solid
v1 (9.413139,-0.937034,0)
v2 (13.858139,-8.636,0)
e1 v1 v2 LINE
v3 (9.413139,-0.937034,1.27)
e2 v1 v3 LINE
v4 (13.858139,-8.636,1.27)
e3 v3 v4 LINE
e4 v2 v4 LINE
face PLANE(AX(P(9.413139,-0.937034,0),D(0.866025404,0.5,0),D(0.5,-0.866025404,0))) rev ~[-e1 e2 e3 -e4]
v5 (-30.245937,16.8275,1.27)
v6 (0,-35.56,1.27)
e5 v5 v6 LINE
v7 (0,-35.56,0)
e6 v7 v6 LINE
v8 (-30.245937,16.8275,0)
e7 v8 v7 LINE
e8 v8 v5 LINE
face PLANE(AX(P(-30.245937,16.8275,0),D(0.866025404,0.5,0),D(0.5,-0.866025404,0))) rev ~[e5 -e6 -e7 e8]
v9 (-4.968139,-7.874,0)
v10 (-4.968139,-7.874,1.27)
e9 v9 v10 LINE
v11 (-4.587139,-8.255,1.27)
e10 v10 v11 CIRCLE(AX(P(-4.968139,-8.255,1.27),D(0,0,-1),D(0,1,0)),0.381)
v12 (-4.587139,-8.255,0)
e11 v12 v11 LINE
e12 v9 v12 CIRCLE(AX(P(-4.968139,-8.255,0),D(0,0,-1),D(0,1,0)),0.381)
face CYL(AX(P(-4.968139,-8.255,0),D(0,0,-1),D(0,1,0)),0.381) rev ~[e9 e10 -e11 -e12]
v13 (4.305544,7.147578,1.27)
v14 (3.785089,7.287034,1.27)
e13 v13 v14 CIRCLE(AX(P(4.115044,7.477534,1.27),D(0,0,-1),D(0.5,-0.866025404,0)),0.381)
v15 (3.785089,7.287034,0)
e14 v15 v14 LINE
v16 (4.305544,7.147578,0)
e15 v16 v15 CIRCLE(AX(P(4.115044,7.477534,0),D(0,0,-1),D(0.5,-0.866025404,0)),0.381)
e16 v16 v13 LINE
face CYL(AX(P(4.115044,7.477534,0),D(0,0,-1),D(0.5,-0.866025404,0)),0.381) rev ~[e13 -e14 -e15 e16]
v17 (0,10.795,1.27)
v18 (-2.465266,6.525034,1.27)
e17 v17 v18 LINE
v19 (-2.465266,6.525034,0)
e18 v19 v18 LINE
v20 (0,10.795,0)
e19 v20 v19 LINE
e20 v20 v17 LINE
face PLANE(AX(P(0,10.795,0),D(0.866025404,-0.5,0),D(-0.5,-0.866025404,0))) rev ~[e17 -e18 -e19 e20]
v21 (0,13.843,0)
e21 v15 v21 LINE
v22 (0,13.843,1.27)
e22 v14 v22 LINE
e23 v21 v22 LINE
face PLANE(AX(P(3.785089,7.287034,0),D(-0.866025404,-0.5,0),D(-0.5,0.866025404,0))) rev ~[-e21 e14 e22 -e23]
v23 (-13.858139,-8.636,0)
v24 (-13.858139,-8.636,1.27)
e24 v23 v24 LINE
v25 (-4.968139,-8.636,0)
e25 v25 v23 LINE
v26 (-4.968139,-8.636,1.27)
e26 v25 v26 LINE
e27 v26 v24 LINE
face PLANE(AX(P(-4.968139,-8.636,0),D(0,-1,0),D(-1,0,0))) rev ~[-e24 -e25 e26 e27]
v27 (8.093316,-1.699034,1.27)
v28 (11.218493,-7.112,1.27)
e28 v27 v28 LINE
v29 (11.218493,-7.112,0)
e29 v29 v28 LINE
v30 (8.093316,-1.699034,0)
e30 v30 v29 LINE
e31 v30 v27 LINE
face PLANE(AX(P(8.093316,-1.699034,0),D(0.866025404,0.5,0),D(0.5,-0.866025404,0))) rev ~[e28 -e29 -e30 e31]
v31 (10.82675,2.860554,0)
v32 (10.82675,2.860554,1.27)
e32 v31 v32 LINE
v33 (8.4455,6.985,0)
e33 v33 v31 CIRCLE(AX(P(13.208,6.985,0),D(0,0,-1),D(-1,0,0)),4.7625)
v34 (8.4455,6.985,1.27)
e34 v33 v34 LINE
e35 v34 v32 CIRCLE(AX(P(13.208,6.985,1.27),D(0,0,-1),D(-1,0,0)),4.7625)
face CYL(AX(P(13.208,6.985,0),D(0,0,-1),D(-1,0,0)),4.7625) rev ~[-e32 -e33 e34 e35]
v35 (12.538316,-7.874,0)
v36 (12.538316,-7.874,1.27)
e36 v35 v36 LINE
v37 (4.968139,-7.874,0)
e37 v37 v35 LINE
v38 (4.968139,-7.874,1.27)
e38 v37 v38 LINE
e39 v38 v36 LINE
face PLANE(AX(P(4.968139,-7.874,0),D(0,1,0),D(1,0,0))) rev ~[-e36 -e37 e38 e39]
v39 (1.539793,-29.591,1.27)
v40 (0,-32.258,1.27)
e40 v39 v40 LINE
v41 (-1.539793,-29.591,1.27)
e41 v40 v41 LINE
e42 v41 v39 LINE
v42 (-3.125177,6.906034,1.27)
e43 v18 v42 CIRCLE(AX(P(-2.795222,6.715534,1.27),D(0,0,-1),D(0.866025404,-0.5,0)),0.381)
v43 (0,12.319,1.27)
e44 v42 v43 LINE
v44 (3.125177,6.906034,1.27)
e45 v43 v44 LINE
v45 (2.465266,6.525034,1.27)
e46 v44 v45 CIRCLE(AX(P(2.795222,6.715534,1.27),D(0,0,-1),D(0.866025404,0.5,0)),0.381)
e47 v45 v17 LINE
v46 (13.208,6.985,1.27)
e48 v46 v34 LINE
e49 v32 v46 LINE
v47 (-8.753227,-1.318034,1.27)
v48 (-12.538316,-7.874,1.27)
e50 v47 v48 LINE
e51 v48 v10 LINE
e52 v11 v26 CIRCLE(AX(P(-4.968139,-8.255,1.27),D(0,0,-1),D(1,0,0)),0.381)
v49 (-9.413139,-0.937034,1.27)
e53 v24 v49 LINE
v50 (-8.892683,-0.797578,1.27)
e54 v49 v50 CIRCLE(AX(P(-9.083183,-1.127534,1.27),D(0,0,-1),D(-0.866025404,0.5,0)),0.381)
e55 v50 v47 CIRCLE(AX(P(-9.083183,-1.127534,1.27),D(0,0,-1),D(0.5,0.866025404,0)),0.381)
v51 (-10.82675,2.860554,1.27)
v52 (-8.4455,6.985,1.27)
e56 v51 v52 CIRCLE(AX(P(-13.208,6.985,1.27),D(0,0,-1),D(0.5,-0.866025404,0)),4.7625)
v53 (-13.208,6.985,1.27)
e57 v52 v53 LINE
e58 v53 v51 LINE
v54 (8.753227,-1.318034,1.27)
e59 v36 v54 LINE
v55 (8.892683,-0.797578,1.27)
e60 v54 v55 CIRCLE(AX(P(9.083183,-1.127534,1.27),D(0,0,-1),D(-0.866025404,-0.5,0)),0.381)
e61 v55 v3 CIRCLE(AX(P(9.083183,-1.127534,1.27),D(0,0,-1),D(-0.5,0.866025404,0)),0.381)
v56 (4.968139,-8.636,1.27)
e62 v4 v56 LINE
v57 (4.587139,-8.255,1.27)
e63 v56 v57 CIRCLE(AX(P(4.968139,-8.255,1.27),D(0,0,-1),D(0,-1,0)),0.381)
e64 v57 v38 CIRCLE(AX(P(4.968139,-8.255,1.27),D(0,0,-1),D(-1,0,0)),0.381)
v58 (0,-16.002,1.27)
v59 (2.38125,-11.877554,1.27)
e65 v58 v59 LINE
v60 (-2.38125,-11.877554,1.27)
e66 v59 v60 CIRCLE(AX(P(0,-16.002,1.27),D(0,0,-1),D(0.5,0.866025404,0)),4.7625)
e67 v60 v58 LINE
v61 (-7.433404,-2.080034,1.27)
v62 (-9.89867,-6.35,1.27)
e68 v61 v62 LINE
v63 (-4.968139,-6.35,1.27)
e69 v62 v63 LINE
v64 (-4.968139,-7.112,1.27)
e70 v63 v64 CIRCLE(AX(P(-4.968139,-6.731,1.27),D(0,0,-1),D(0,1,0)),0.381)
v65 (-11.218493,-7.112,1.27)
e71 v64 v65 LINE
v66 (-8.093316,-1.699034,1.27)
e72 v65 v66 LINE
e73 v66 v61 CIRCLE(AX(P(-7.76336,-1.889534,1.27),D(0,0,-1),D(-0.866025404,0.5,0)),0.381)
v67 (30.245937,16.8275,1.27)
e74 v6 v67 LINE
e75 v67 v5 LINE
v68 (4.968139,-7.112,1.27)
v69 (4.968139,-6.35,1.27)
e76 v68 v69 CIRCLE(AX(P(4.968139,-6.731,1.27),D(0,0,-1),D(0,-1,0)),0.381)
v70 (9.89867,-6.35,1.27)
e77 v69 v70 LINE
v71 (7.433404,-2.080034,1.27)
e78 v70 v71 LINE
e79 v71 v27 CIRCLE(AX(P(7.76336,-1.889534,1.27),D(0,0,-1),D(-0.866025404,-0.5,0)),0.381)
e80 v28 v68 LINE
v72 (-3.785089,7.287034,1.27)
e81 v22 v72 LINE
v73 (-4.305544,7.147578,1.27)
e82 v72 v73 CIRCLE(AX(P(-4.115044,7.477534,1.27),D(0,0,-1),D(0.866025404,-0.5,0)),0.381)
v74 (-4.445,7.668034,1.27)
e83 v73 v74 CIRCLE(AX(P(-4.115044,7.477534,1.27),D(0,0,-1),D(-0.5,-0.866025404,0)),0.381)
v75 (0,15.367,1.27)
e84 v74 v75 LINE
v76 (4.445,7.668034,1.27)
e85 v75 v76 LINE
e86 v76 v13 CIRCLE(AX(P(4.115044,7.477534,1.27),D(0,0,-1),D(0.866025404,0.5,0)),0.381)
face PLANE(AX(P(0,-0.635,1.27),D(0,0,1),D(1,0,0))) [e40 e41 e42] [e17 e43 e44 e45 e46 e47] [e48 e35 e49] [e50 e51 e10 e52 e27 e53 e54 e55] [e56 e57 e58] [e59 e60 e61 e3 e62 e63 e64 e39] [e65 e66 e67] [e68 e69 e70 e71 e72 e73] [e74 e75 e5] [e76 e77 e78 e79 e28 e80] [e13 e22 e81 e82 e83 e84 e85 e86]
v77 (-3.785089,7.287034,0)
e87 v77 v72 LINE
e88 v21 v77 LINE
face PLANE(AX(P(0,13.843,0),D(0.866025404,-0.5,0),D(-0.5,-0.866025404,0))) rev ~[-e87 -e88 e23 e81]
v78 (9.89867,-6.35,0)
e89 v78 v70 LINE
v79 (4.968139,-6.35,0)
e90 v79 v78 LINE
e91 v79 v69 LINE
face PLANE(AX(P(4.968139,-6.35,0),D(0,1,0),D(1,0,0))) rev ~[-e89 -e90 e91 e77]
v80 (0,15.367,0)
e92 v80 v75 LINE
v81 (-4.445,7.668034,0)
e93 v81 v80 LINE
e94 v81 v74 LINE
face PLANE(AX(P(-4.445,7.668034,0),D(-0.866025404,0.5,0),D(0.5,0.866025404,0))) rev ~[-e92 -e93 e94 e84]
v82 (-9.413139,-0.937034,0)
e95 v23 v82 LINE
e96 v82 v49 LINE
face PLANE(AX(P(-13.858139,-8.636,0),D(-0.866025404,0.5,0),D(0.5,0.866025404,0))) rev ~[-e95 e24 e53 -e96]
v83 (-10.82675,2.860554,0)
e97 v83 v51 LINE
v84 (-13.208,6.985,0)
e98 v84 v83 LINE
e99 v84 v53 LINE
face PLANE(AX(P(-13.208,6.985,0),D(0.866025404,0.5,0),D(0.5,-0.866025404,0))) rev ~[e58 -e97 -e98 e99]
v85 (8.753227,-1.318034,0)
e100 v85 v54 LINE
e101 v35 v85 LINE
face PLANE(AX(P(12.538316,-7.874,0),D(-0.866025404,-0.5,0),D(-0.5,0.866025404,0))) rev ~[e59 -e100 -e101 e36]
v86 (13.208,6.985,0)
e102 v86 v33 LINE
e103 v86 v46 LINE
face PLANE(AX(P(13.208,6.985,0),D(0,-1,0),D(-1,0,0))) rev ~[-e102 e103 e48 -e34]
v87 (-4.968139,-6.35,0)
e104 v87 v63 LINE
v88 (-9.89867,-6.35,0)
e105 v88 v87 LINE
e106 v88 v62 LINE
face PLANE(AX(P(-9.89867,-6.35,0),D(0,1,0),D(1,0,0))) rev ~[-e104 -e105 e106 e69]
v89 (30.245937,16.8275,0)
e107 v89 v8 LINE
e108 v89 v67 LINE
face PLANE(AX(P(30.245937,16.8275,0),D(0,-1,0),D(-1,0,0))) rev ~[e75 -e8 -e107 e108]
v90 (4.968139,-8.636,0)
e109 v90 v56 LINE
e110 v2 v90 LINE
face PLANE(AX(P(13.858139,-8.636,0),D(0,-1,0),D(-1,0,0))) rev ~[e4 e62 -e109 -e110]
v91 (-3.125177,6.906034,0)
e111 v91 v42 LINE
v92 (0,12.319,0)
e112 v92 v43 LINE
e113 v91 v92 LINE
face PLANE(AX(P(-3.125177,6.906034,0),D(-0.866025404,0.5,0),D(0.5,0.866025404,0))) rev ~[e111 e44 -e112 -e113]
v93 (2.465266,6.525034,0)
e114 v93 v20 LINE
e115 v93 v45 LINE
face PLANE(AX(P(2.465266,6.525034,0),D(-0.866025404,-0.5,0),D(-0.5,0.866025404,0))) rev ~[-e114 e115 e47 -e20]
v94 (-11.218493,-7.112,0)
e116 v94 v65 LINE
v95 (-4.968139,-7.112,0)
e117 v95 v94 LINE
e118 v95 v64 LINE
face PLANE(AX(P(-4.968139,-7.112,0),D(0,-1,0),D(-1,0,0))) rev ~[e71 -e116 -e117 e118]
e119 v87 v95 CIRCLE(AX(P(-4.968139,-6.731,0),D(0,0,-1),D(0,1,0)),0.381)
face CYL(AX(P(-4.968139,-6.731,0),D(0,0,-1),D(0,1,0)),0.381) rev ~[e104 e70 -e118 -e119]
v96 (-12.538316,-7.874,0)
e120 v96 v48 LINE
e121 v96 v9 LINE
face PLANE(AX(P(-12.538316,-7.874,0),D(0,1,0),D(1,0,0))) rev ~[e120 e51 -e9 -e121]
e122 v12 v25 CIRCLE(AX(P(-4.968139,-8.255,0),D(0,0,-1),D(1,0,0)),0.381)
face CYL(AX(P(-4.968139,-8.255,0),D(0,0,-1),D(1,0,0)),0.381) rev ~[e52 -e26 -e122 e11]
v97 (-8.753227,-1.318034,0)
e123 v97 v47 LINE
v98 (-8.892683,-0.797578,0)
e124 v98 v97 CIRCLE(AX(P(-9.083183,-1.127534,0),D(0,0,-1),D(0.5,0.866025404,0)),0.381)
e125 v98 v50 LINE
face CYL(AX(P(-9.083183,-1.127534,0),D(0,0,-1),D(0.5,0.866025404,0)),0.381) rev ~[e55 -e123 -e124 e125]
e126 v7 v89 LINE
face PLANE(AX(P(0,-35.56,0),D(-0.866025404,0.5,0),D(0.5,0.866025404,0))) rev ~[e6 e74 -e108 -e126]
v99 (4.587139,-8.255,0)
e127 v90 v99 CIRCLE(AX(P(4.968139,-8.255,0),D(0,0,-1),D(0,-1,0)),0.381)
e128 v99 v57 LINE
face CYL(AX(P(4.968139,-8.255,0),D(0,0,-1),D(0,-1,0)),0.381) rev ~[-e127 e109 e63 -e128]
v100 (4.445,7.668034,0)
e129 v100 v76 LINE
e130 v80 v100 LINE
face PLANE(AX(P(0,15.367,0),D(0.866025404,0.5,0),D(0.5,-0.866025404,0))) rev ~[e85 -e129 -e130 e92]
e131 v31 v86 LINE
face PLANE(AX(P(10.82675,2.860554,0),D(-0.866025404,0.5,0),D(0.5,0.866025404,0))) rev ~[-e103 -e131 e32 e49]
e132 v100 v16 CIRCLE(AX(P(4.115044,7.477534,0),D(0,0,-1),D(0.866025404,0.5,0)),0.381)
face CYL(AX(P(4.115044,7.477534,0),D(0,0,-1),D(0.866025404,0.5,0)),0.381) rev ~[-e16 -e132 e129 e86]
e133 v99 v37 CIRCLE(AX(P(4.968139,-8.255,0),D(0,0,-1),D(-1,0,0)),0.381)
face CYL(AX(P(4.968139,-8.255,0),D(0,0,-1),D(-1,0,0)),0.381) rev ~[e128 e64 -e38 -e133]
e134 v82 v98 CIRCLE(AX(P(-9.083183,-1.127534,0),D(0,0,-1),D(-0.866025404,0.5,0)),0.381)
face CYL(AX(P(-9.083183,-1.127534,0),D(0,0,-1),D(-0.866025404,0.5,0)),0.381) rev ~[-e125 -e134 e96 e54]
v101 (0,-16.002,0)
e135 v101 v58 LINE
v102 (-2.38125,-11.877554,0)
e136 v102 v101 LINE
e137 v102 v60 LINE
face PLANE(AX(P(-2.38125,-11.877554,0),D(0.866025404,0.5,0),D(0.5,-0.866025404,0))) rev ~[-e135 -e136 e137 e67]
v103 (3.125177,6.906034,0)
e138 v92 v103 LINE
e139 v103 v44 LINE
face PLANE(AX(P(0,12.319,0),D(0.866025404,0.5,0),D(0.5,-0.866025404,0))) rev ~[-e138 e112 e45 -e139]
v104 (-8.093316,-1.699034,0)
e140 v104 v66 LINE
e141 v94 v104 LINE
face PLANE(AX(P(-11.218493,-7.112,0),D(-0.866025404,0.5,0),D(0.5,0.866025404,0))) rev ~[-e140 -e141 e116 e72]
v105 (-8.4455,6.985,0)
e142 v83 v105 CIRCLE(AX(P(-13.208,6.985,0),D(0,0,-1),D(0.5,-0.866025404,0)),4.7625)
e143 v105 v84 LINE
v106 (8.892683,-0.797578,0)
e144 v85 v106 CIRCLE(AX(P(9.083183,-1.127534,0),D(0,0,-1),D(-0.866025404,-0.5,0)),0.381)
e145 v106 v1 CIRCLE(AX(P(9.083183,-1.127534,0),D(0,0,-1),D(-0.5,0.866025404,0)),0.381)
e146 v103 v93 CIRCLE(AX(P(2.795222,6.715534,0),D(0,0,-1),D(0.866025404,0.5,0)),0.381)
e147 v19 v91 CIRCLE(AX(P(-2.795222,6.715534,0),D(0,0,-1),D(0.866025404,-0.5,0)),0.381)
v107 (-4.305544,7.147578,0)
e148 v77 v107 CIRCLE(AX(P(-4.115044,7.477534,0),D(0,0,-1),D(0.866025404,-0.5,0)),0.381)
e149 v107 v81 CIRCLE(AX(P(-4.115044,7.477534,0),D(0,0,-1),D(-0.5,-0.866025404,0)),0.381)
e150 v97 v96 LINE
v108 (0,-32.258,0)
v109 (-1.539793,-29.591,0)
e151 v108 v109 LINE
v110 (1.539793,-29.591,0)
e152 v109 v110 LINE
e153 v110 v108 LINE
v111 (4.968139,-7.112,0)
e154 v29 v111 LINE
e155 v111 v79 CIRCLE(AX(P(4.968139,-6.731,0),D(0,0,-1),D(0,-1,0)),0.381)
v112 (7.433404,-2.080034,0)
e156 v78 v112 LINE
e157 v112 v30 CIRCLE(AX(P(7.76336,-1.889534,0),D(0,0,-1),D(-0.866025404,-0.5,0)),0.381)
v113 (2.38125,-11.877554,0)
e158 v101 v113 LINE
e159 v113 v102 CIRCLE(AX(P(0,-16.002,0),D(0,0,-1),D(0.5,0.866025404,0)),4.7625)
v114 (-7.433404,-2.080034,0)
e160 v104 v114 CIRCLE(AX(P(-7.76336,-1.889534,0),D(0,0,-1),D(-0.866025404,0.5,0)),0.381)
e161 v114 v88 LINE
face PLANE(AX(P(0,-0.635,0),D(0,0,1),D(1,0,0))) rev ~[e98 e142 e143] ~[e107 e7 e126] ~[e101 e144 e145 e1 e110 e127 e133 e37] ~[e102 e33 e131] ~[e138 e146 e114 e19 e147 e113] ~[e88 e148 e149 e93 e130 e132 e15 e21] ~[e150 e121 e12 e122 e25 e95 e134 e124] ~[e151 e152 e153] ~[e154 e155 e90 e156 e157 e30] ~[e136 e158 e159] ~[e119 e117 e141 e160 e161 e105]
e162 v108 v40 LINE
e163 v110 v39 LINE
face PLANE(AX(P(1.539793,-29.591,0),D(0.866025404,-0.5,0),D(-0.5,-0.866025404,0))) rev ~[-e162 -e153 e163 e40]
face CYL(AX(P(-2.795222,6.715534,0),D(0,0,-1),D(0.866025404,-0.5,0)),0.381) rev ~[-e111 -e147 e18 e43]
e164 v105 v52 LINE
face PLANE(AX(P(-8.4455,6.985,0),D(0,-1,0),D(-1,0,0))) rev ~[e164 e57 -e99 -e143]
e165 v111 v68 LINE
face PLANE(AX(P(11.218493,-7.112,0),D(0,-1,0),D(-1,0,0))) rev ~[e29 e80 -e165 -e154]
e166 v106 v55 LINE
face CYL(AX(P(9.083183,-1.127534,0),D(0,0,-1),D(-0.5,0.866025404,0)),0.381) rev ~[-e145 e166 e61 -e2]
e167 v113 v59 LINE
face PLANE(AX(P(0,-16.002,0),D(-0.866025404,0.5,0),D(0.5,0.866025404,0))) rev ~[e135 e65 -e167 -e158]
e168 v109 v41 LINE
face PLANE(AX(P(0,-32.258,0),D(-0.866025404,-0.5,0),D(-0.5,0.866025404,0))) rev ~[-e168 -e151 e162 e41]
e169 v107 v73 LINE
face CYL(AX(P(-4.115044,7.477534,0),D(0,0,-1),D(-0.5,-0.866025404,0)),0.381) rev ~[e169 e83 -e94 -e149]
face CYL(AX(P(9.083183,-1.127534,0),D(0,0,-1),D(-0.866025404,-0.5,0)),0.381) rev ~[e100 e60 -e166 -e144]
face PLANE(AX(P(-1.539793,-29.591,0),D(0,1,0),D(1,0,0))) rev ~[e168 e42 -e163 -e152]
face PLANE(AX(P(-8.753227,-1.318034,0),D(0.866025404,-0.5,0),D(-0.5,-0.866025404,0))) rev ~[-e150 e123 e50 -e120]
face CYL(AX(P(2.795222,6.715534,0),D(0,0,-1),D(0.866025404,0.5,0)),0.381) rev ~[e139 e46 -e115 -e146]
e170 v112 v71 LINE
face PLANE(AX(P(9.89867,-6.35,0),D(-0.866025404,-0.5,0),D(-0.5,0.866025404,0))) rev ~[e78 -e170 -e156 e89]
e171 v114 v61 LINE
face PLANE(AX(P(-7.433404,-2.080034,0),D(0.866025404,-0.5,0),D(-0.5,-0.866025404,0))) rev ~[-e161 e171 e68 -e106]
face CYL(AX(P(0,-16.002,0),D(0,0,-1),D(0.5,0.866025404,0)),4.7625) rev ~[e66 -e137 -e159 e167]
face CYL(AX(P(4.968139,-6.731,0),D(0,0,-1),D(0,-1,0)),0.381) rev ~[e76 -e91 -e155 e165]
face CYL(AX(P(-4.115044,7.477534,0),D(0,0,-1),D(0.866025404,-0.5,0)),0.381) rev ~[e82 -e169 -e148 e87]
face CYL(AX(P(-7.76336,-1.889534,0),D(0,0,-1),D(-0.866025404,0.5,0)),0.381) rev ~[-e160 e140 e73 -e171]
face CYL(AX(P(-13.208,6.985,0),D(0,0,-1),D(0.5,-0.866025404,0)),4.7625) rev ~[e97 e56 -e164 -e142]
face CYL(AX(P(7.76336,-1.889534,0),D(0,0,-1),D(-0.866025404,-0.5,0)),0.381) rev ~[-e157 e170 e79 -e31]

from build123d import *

# Parameters (mm, degrees)
F1_DEPTH = 1.27


# Not quite as in the source:
# - a feature of the source that left no trace in its solid (it failed there, or was rolled back) is left out


with BuildPart() as f1:
    # F0 (on Top) → F1 (new body)
    with BuildSketch(Plane.XY):
        Polygon((30.2459372272, 16.8275), (-30.2459372272, 16.8275), (0, -35.56), align=None)
        Polygon((-1.5397931679, -29.591), (1.5397931679, -29.591), (0, -32.258), align=None, mode=Mode.SUBTRACT)
        with BuildLine():
            ThreePointArc((2.38125, -11.8775540145), (0, -20.7645), (-2.38125, -11.8775540145))
            Line((-2.38125, -11.8775540145), (0, -16.002))
            Line((0, -16.002), (2.38125, -11.8775540145))
        make_face(mode=Mode.SUBTRACT)
        with BuildLine():
            Line((-8.7532271537, -1.3180341604), (-12.538315796, -7.874))
            Line((-12.538315796, -7.874), (-4.9681385114, -7.874))
            ThreePointArc((-4.9681385114, -7.874), (-4.6987308277, -7.9855923164), (-4.5871385114, -8.255))
            ThreePointArc((-4.5871385114, -8.255), (-4.6987308277, -8.5244076836), (-4.9681385114, -8.636))
            Line((-4.9681385114, -8.636), (-13.8581385114, -8.636))
            Line((-13.8581385114, -8.636), (-9.4131385114, -0.9370341604))
            ThreePointArc((-9.4131385114, -0.9370341604), (-9.1817928887, -0.7595164205), (-8.8926828325, -0.7975784815))
            ThreePointArc((-8.8926828325, -0.7975784815), (-8.7151650927, -1.0289241042), (-8.7532271537, -1.3180341604))
        make_face(mode=Mode.SUBTRACT)
        with BuildLine():
            Line((-4.9681385114, -7.112), (-11.2184930806, -7.112))
            Line((-11.2184930806, -7.112), (-8.093315796, -1.6990341604))
            ThreePointArc((-8.093315796, -1.6990341604), (-7.5728601171, -1.5595784815), (-7.4334044383, -2.0800341604))
            Line((-7.4334044383, -2.0800341604), (-9.8986703653, -6.35))
            Line((-9.8986703653, -6.35), (-4.9681385114, -6.35))
            ThreePointArc((-4.9681385114, -6.35), (-4.5871385114, -6.731), (-4.9681385114, -7.112))
        make_face(mode=Mode.SUBTRACT)
        with BuildLine():
            ThreePointArc((-10.82675, 2.8605540145), (-17.3324459855, 9.36625), (-8.4455, 6.985))
            Line((-8.4455, 6.985), (-13.208, 6.985))
            Line((-13.208, 6.985), (-10.82675, 2.8605540145))
        make_face(mode=Mode.SUBTRACT)
        with BuildLine():
            Line((4.9681385114, -7.874), (12.538315796, -7.874))
            Line((12.538315796, -7.874), (8.7532271537, -1.3180341604))
            ThreePointArc((8.7532271537, -1.3180341604), (8.7151650927, -1.0289241042), (8.8926828325, -0.7975784815))
            ThreePointArc((8.8926828325, -0.7975784815), (9.1817928887, -0.7595164205), (9.4131385114, -0.9370341604))
            Line((9.4131385114, -0.9370341604), (13.8581385114, -8.636))
            Line((13.8581385114, -8.636), (4.9681385114, -8.636))
            ThreePointArc((4.9681385114, -8.636), (4.6987308277, -8.5244076836), (4.5871385114, -8.255))
            ThreePointArc((4.5871385114, -8.255), (4.6987308277, -7.9855923164), (4.9681385114, -7.874))
        make_face(mode=Mode.SUBTRACT)
        with BuildLine():
            Line((4.9681385114, -6.35), (9.8986703653, -6.35))
            Line((9.8986703653, -6.35), (7.4334044383, -2.0800341604))
            ThreePointArc((7.4334044383, -2.0800341604), (7.5728601171, -1.5595784815), (8.093315796, -1.6990341604))
            Line((8.093315796, -1.6990341604), (11.2184930806, -7.112))
            Line((11.2184930806, -7.112), (4.9681385114, -7.112))
            ThreePointArc((4.9681385114, -7.112), (4.5871385114, -6.731), (4.9681385114, -6.35))
        make_face(mode=Mode.SUBTRACT)
        with BuildLine():
            Line((-3.1251772846, 6.9060341604), (0, 12.319))
            Line((0, 12.319), (3.1251772846, 6.9060341604))
            ThreePointArc((3.1251772846, 6.9060341604), (2.9857216058, 6.3855784815), (2.4652659269, 6.5250341604))
            Line((2.4652659269, 6.5250341604), (0, 10.795))
            Line((0, 10.795), (-2.4652659269, 6.5250341604))
            ThreePointArc((-2.4652659269, 6.5250341604), (-2.9857216058, 6.3855784815), (-3.1251772846, 6.9060341604))
        make_face(mode=Mode.SUBTRACT)
        with BuildLine():
            ThreePointArc((8.4455, 6.985), (17.3324459855, 9.36625), (10.82675, 2.8605540145))
            Line((10.82675, 2.8605540145), (13.208, 6.985))
            Line((13.208, 6.985), (8.4455, 6.985))
        make_face(mode=Mode.SUBTRACT)
        with BuildLine():
            Line((3.7850886423, 7.2870341604), (0, 13.843))
            Line((0, 13.843), (-3.7850886423, 7.2870341604))
            ThreePointArc((-3.7850886423, 7.2870341604), (-4.016434265, 7.1095164205), (-4.3055443212, 7.1475784815))
            ThreePointArc((-4.3055443212, 7.1475784815), (-4.483062061, 7.3789241042), (-4.445, 7.6680341604))
            Line((-4.445, 7.6680341604), (0, 15.367))
            Line((0, 15.367), (4.445, 7.6680341604))
            ThreePointArc((4.445, 7.6680341604), (4.483062061, 7.3789241042), (4.3055443212, 7.1475784815))
            ThreePointArc((4.3055443212, 7.1475784815), (4.016434265, 7.1095164205), (3.7850886423, 7.2870341604))
        make_face(mode=Mode.SUBTRACT)
    extrude(amount=F1_DEPTH)


solid = f1.part
